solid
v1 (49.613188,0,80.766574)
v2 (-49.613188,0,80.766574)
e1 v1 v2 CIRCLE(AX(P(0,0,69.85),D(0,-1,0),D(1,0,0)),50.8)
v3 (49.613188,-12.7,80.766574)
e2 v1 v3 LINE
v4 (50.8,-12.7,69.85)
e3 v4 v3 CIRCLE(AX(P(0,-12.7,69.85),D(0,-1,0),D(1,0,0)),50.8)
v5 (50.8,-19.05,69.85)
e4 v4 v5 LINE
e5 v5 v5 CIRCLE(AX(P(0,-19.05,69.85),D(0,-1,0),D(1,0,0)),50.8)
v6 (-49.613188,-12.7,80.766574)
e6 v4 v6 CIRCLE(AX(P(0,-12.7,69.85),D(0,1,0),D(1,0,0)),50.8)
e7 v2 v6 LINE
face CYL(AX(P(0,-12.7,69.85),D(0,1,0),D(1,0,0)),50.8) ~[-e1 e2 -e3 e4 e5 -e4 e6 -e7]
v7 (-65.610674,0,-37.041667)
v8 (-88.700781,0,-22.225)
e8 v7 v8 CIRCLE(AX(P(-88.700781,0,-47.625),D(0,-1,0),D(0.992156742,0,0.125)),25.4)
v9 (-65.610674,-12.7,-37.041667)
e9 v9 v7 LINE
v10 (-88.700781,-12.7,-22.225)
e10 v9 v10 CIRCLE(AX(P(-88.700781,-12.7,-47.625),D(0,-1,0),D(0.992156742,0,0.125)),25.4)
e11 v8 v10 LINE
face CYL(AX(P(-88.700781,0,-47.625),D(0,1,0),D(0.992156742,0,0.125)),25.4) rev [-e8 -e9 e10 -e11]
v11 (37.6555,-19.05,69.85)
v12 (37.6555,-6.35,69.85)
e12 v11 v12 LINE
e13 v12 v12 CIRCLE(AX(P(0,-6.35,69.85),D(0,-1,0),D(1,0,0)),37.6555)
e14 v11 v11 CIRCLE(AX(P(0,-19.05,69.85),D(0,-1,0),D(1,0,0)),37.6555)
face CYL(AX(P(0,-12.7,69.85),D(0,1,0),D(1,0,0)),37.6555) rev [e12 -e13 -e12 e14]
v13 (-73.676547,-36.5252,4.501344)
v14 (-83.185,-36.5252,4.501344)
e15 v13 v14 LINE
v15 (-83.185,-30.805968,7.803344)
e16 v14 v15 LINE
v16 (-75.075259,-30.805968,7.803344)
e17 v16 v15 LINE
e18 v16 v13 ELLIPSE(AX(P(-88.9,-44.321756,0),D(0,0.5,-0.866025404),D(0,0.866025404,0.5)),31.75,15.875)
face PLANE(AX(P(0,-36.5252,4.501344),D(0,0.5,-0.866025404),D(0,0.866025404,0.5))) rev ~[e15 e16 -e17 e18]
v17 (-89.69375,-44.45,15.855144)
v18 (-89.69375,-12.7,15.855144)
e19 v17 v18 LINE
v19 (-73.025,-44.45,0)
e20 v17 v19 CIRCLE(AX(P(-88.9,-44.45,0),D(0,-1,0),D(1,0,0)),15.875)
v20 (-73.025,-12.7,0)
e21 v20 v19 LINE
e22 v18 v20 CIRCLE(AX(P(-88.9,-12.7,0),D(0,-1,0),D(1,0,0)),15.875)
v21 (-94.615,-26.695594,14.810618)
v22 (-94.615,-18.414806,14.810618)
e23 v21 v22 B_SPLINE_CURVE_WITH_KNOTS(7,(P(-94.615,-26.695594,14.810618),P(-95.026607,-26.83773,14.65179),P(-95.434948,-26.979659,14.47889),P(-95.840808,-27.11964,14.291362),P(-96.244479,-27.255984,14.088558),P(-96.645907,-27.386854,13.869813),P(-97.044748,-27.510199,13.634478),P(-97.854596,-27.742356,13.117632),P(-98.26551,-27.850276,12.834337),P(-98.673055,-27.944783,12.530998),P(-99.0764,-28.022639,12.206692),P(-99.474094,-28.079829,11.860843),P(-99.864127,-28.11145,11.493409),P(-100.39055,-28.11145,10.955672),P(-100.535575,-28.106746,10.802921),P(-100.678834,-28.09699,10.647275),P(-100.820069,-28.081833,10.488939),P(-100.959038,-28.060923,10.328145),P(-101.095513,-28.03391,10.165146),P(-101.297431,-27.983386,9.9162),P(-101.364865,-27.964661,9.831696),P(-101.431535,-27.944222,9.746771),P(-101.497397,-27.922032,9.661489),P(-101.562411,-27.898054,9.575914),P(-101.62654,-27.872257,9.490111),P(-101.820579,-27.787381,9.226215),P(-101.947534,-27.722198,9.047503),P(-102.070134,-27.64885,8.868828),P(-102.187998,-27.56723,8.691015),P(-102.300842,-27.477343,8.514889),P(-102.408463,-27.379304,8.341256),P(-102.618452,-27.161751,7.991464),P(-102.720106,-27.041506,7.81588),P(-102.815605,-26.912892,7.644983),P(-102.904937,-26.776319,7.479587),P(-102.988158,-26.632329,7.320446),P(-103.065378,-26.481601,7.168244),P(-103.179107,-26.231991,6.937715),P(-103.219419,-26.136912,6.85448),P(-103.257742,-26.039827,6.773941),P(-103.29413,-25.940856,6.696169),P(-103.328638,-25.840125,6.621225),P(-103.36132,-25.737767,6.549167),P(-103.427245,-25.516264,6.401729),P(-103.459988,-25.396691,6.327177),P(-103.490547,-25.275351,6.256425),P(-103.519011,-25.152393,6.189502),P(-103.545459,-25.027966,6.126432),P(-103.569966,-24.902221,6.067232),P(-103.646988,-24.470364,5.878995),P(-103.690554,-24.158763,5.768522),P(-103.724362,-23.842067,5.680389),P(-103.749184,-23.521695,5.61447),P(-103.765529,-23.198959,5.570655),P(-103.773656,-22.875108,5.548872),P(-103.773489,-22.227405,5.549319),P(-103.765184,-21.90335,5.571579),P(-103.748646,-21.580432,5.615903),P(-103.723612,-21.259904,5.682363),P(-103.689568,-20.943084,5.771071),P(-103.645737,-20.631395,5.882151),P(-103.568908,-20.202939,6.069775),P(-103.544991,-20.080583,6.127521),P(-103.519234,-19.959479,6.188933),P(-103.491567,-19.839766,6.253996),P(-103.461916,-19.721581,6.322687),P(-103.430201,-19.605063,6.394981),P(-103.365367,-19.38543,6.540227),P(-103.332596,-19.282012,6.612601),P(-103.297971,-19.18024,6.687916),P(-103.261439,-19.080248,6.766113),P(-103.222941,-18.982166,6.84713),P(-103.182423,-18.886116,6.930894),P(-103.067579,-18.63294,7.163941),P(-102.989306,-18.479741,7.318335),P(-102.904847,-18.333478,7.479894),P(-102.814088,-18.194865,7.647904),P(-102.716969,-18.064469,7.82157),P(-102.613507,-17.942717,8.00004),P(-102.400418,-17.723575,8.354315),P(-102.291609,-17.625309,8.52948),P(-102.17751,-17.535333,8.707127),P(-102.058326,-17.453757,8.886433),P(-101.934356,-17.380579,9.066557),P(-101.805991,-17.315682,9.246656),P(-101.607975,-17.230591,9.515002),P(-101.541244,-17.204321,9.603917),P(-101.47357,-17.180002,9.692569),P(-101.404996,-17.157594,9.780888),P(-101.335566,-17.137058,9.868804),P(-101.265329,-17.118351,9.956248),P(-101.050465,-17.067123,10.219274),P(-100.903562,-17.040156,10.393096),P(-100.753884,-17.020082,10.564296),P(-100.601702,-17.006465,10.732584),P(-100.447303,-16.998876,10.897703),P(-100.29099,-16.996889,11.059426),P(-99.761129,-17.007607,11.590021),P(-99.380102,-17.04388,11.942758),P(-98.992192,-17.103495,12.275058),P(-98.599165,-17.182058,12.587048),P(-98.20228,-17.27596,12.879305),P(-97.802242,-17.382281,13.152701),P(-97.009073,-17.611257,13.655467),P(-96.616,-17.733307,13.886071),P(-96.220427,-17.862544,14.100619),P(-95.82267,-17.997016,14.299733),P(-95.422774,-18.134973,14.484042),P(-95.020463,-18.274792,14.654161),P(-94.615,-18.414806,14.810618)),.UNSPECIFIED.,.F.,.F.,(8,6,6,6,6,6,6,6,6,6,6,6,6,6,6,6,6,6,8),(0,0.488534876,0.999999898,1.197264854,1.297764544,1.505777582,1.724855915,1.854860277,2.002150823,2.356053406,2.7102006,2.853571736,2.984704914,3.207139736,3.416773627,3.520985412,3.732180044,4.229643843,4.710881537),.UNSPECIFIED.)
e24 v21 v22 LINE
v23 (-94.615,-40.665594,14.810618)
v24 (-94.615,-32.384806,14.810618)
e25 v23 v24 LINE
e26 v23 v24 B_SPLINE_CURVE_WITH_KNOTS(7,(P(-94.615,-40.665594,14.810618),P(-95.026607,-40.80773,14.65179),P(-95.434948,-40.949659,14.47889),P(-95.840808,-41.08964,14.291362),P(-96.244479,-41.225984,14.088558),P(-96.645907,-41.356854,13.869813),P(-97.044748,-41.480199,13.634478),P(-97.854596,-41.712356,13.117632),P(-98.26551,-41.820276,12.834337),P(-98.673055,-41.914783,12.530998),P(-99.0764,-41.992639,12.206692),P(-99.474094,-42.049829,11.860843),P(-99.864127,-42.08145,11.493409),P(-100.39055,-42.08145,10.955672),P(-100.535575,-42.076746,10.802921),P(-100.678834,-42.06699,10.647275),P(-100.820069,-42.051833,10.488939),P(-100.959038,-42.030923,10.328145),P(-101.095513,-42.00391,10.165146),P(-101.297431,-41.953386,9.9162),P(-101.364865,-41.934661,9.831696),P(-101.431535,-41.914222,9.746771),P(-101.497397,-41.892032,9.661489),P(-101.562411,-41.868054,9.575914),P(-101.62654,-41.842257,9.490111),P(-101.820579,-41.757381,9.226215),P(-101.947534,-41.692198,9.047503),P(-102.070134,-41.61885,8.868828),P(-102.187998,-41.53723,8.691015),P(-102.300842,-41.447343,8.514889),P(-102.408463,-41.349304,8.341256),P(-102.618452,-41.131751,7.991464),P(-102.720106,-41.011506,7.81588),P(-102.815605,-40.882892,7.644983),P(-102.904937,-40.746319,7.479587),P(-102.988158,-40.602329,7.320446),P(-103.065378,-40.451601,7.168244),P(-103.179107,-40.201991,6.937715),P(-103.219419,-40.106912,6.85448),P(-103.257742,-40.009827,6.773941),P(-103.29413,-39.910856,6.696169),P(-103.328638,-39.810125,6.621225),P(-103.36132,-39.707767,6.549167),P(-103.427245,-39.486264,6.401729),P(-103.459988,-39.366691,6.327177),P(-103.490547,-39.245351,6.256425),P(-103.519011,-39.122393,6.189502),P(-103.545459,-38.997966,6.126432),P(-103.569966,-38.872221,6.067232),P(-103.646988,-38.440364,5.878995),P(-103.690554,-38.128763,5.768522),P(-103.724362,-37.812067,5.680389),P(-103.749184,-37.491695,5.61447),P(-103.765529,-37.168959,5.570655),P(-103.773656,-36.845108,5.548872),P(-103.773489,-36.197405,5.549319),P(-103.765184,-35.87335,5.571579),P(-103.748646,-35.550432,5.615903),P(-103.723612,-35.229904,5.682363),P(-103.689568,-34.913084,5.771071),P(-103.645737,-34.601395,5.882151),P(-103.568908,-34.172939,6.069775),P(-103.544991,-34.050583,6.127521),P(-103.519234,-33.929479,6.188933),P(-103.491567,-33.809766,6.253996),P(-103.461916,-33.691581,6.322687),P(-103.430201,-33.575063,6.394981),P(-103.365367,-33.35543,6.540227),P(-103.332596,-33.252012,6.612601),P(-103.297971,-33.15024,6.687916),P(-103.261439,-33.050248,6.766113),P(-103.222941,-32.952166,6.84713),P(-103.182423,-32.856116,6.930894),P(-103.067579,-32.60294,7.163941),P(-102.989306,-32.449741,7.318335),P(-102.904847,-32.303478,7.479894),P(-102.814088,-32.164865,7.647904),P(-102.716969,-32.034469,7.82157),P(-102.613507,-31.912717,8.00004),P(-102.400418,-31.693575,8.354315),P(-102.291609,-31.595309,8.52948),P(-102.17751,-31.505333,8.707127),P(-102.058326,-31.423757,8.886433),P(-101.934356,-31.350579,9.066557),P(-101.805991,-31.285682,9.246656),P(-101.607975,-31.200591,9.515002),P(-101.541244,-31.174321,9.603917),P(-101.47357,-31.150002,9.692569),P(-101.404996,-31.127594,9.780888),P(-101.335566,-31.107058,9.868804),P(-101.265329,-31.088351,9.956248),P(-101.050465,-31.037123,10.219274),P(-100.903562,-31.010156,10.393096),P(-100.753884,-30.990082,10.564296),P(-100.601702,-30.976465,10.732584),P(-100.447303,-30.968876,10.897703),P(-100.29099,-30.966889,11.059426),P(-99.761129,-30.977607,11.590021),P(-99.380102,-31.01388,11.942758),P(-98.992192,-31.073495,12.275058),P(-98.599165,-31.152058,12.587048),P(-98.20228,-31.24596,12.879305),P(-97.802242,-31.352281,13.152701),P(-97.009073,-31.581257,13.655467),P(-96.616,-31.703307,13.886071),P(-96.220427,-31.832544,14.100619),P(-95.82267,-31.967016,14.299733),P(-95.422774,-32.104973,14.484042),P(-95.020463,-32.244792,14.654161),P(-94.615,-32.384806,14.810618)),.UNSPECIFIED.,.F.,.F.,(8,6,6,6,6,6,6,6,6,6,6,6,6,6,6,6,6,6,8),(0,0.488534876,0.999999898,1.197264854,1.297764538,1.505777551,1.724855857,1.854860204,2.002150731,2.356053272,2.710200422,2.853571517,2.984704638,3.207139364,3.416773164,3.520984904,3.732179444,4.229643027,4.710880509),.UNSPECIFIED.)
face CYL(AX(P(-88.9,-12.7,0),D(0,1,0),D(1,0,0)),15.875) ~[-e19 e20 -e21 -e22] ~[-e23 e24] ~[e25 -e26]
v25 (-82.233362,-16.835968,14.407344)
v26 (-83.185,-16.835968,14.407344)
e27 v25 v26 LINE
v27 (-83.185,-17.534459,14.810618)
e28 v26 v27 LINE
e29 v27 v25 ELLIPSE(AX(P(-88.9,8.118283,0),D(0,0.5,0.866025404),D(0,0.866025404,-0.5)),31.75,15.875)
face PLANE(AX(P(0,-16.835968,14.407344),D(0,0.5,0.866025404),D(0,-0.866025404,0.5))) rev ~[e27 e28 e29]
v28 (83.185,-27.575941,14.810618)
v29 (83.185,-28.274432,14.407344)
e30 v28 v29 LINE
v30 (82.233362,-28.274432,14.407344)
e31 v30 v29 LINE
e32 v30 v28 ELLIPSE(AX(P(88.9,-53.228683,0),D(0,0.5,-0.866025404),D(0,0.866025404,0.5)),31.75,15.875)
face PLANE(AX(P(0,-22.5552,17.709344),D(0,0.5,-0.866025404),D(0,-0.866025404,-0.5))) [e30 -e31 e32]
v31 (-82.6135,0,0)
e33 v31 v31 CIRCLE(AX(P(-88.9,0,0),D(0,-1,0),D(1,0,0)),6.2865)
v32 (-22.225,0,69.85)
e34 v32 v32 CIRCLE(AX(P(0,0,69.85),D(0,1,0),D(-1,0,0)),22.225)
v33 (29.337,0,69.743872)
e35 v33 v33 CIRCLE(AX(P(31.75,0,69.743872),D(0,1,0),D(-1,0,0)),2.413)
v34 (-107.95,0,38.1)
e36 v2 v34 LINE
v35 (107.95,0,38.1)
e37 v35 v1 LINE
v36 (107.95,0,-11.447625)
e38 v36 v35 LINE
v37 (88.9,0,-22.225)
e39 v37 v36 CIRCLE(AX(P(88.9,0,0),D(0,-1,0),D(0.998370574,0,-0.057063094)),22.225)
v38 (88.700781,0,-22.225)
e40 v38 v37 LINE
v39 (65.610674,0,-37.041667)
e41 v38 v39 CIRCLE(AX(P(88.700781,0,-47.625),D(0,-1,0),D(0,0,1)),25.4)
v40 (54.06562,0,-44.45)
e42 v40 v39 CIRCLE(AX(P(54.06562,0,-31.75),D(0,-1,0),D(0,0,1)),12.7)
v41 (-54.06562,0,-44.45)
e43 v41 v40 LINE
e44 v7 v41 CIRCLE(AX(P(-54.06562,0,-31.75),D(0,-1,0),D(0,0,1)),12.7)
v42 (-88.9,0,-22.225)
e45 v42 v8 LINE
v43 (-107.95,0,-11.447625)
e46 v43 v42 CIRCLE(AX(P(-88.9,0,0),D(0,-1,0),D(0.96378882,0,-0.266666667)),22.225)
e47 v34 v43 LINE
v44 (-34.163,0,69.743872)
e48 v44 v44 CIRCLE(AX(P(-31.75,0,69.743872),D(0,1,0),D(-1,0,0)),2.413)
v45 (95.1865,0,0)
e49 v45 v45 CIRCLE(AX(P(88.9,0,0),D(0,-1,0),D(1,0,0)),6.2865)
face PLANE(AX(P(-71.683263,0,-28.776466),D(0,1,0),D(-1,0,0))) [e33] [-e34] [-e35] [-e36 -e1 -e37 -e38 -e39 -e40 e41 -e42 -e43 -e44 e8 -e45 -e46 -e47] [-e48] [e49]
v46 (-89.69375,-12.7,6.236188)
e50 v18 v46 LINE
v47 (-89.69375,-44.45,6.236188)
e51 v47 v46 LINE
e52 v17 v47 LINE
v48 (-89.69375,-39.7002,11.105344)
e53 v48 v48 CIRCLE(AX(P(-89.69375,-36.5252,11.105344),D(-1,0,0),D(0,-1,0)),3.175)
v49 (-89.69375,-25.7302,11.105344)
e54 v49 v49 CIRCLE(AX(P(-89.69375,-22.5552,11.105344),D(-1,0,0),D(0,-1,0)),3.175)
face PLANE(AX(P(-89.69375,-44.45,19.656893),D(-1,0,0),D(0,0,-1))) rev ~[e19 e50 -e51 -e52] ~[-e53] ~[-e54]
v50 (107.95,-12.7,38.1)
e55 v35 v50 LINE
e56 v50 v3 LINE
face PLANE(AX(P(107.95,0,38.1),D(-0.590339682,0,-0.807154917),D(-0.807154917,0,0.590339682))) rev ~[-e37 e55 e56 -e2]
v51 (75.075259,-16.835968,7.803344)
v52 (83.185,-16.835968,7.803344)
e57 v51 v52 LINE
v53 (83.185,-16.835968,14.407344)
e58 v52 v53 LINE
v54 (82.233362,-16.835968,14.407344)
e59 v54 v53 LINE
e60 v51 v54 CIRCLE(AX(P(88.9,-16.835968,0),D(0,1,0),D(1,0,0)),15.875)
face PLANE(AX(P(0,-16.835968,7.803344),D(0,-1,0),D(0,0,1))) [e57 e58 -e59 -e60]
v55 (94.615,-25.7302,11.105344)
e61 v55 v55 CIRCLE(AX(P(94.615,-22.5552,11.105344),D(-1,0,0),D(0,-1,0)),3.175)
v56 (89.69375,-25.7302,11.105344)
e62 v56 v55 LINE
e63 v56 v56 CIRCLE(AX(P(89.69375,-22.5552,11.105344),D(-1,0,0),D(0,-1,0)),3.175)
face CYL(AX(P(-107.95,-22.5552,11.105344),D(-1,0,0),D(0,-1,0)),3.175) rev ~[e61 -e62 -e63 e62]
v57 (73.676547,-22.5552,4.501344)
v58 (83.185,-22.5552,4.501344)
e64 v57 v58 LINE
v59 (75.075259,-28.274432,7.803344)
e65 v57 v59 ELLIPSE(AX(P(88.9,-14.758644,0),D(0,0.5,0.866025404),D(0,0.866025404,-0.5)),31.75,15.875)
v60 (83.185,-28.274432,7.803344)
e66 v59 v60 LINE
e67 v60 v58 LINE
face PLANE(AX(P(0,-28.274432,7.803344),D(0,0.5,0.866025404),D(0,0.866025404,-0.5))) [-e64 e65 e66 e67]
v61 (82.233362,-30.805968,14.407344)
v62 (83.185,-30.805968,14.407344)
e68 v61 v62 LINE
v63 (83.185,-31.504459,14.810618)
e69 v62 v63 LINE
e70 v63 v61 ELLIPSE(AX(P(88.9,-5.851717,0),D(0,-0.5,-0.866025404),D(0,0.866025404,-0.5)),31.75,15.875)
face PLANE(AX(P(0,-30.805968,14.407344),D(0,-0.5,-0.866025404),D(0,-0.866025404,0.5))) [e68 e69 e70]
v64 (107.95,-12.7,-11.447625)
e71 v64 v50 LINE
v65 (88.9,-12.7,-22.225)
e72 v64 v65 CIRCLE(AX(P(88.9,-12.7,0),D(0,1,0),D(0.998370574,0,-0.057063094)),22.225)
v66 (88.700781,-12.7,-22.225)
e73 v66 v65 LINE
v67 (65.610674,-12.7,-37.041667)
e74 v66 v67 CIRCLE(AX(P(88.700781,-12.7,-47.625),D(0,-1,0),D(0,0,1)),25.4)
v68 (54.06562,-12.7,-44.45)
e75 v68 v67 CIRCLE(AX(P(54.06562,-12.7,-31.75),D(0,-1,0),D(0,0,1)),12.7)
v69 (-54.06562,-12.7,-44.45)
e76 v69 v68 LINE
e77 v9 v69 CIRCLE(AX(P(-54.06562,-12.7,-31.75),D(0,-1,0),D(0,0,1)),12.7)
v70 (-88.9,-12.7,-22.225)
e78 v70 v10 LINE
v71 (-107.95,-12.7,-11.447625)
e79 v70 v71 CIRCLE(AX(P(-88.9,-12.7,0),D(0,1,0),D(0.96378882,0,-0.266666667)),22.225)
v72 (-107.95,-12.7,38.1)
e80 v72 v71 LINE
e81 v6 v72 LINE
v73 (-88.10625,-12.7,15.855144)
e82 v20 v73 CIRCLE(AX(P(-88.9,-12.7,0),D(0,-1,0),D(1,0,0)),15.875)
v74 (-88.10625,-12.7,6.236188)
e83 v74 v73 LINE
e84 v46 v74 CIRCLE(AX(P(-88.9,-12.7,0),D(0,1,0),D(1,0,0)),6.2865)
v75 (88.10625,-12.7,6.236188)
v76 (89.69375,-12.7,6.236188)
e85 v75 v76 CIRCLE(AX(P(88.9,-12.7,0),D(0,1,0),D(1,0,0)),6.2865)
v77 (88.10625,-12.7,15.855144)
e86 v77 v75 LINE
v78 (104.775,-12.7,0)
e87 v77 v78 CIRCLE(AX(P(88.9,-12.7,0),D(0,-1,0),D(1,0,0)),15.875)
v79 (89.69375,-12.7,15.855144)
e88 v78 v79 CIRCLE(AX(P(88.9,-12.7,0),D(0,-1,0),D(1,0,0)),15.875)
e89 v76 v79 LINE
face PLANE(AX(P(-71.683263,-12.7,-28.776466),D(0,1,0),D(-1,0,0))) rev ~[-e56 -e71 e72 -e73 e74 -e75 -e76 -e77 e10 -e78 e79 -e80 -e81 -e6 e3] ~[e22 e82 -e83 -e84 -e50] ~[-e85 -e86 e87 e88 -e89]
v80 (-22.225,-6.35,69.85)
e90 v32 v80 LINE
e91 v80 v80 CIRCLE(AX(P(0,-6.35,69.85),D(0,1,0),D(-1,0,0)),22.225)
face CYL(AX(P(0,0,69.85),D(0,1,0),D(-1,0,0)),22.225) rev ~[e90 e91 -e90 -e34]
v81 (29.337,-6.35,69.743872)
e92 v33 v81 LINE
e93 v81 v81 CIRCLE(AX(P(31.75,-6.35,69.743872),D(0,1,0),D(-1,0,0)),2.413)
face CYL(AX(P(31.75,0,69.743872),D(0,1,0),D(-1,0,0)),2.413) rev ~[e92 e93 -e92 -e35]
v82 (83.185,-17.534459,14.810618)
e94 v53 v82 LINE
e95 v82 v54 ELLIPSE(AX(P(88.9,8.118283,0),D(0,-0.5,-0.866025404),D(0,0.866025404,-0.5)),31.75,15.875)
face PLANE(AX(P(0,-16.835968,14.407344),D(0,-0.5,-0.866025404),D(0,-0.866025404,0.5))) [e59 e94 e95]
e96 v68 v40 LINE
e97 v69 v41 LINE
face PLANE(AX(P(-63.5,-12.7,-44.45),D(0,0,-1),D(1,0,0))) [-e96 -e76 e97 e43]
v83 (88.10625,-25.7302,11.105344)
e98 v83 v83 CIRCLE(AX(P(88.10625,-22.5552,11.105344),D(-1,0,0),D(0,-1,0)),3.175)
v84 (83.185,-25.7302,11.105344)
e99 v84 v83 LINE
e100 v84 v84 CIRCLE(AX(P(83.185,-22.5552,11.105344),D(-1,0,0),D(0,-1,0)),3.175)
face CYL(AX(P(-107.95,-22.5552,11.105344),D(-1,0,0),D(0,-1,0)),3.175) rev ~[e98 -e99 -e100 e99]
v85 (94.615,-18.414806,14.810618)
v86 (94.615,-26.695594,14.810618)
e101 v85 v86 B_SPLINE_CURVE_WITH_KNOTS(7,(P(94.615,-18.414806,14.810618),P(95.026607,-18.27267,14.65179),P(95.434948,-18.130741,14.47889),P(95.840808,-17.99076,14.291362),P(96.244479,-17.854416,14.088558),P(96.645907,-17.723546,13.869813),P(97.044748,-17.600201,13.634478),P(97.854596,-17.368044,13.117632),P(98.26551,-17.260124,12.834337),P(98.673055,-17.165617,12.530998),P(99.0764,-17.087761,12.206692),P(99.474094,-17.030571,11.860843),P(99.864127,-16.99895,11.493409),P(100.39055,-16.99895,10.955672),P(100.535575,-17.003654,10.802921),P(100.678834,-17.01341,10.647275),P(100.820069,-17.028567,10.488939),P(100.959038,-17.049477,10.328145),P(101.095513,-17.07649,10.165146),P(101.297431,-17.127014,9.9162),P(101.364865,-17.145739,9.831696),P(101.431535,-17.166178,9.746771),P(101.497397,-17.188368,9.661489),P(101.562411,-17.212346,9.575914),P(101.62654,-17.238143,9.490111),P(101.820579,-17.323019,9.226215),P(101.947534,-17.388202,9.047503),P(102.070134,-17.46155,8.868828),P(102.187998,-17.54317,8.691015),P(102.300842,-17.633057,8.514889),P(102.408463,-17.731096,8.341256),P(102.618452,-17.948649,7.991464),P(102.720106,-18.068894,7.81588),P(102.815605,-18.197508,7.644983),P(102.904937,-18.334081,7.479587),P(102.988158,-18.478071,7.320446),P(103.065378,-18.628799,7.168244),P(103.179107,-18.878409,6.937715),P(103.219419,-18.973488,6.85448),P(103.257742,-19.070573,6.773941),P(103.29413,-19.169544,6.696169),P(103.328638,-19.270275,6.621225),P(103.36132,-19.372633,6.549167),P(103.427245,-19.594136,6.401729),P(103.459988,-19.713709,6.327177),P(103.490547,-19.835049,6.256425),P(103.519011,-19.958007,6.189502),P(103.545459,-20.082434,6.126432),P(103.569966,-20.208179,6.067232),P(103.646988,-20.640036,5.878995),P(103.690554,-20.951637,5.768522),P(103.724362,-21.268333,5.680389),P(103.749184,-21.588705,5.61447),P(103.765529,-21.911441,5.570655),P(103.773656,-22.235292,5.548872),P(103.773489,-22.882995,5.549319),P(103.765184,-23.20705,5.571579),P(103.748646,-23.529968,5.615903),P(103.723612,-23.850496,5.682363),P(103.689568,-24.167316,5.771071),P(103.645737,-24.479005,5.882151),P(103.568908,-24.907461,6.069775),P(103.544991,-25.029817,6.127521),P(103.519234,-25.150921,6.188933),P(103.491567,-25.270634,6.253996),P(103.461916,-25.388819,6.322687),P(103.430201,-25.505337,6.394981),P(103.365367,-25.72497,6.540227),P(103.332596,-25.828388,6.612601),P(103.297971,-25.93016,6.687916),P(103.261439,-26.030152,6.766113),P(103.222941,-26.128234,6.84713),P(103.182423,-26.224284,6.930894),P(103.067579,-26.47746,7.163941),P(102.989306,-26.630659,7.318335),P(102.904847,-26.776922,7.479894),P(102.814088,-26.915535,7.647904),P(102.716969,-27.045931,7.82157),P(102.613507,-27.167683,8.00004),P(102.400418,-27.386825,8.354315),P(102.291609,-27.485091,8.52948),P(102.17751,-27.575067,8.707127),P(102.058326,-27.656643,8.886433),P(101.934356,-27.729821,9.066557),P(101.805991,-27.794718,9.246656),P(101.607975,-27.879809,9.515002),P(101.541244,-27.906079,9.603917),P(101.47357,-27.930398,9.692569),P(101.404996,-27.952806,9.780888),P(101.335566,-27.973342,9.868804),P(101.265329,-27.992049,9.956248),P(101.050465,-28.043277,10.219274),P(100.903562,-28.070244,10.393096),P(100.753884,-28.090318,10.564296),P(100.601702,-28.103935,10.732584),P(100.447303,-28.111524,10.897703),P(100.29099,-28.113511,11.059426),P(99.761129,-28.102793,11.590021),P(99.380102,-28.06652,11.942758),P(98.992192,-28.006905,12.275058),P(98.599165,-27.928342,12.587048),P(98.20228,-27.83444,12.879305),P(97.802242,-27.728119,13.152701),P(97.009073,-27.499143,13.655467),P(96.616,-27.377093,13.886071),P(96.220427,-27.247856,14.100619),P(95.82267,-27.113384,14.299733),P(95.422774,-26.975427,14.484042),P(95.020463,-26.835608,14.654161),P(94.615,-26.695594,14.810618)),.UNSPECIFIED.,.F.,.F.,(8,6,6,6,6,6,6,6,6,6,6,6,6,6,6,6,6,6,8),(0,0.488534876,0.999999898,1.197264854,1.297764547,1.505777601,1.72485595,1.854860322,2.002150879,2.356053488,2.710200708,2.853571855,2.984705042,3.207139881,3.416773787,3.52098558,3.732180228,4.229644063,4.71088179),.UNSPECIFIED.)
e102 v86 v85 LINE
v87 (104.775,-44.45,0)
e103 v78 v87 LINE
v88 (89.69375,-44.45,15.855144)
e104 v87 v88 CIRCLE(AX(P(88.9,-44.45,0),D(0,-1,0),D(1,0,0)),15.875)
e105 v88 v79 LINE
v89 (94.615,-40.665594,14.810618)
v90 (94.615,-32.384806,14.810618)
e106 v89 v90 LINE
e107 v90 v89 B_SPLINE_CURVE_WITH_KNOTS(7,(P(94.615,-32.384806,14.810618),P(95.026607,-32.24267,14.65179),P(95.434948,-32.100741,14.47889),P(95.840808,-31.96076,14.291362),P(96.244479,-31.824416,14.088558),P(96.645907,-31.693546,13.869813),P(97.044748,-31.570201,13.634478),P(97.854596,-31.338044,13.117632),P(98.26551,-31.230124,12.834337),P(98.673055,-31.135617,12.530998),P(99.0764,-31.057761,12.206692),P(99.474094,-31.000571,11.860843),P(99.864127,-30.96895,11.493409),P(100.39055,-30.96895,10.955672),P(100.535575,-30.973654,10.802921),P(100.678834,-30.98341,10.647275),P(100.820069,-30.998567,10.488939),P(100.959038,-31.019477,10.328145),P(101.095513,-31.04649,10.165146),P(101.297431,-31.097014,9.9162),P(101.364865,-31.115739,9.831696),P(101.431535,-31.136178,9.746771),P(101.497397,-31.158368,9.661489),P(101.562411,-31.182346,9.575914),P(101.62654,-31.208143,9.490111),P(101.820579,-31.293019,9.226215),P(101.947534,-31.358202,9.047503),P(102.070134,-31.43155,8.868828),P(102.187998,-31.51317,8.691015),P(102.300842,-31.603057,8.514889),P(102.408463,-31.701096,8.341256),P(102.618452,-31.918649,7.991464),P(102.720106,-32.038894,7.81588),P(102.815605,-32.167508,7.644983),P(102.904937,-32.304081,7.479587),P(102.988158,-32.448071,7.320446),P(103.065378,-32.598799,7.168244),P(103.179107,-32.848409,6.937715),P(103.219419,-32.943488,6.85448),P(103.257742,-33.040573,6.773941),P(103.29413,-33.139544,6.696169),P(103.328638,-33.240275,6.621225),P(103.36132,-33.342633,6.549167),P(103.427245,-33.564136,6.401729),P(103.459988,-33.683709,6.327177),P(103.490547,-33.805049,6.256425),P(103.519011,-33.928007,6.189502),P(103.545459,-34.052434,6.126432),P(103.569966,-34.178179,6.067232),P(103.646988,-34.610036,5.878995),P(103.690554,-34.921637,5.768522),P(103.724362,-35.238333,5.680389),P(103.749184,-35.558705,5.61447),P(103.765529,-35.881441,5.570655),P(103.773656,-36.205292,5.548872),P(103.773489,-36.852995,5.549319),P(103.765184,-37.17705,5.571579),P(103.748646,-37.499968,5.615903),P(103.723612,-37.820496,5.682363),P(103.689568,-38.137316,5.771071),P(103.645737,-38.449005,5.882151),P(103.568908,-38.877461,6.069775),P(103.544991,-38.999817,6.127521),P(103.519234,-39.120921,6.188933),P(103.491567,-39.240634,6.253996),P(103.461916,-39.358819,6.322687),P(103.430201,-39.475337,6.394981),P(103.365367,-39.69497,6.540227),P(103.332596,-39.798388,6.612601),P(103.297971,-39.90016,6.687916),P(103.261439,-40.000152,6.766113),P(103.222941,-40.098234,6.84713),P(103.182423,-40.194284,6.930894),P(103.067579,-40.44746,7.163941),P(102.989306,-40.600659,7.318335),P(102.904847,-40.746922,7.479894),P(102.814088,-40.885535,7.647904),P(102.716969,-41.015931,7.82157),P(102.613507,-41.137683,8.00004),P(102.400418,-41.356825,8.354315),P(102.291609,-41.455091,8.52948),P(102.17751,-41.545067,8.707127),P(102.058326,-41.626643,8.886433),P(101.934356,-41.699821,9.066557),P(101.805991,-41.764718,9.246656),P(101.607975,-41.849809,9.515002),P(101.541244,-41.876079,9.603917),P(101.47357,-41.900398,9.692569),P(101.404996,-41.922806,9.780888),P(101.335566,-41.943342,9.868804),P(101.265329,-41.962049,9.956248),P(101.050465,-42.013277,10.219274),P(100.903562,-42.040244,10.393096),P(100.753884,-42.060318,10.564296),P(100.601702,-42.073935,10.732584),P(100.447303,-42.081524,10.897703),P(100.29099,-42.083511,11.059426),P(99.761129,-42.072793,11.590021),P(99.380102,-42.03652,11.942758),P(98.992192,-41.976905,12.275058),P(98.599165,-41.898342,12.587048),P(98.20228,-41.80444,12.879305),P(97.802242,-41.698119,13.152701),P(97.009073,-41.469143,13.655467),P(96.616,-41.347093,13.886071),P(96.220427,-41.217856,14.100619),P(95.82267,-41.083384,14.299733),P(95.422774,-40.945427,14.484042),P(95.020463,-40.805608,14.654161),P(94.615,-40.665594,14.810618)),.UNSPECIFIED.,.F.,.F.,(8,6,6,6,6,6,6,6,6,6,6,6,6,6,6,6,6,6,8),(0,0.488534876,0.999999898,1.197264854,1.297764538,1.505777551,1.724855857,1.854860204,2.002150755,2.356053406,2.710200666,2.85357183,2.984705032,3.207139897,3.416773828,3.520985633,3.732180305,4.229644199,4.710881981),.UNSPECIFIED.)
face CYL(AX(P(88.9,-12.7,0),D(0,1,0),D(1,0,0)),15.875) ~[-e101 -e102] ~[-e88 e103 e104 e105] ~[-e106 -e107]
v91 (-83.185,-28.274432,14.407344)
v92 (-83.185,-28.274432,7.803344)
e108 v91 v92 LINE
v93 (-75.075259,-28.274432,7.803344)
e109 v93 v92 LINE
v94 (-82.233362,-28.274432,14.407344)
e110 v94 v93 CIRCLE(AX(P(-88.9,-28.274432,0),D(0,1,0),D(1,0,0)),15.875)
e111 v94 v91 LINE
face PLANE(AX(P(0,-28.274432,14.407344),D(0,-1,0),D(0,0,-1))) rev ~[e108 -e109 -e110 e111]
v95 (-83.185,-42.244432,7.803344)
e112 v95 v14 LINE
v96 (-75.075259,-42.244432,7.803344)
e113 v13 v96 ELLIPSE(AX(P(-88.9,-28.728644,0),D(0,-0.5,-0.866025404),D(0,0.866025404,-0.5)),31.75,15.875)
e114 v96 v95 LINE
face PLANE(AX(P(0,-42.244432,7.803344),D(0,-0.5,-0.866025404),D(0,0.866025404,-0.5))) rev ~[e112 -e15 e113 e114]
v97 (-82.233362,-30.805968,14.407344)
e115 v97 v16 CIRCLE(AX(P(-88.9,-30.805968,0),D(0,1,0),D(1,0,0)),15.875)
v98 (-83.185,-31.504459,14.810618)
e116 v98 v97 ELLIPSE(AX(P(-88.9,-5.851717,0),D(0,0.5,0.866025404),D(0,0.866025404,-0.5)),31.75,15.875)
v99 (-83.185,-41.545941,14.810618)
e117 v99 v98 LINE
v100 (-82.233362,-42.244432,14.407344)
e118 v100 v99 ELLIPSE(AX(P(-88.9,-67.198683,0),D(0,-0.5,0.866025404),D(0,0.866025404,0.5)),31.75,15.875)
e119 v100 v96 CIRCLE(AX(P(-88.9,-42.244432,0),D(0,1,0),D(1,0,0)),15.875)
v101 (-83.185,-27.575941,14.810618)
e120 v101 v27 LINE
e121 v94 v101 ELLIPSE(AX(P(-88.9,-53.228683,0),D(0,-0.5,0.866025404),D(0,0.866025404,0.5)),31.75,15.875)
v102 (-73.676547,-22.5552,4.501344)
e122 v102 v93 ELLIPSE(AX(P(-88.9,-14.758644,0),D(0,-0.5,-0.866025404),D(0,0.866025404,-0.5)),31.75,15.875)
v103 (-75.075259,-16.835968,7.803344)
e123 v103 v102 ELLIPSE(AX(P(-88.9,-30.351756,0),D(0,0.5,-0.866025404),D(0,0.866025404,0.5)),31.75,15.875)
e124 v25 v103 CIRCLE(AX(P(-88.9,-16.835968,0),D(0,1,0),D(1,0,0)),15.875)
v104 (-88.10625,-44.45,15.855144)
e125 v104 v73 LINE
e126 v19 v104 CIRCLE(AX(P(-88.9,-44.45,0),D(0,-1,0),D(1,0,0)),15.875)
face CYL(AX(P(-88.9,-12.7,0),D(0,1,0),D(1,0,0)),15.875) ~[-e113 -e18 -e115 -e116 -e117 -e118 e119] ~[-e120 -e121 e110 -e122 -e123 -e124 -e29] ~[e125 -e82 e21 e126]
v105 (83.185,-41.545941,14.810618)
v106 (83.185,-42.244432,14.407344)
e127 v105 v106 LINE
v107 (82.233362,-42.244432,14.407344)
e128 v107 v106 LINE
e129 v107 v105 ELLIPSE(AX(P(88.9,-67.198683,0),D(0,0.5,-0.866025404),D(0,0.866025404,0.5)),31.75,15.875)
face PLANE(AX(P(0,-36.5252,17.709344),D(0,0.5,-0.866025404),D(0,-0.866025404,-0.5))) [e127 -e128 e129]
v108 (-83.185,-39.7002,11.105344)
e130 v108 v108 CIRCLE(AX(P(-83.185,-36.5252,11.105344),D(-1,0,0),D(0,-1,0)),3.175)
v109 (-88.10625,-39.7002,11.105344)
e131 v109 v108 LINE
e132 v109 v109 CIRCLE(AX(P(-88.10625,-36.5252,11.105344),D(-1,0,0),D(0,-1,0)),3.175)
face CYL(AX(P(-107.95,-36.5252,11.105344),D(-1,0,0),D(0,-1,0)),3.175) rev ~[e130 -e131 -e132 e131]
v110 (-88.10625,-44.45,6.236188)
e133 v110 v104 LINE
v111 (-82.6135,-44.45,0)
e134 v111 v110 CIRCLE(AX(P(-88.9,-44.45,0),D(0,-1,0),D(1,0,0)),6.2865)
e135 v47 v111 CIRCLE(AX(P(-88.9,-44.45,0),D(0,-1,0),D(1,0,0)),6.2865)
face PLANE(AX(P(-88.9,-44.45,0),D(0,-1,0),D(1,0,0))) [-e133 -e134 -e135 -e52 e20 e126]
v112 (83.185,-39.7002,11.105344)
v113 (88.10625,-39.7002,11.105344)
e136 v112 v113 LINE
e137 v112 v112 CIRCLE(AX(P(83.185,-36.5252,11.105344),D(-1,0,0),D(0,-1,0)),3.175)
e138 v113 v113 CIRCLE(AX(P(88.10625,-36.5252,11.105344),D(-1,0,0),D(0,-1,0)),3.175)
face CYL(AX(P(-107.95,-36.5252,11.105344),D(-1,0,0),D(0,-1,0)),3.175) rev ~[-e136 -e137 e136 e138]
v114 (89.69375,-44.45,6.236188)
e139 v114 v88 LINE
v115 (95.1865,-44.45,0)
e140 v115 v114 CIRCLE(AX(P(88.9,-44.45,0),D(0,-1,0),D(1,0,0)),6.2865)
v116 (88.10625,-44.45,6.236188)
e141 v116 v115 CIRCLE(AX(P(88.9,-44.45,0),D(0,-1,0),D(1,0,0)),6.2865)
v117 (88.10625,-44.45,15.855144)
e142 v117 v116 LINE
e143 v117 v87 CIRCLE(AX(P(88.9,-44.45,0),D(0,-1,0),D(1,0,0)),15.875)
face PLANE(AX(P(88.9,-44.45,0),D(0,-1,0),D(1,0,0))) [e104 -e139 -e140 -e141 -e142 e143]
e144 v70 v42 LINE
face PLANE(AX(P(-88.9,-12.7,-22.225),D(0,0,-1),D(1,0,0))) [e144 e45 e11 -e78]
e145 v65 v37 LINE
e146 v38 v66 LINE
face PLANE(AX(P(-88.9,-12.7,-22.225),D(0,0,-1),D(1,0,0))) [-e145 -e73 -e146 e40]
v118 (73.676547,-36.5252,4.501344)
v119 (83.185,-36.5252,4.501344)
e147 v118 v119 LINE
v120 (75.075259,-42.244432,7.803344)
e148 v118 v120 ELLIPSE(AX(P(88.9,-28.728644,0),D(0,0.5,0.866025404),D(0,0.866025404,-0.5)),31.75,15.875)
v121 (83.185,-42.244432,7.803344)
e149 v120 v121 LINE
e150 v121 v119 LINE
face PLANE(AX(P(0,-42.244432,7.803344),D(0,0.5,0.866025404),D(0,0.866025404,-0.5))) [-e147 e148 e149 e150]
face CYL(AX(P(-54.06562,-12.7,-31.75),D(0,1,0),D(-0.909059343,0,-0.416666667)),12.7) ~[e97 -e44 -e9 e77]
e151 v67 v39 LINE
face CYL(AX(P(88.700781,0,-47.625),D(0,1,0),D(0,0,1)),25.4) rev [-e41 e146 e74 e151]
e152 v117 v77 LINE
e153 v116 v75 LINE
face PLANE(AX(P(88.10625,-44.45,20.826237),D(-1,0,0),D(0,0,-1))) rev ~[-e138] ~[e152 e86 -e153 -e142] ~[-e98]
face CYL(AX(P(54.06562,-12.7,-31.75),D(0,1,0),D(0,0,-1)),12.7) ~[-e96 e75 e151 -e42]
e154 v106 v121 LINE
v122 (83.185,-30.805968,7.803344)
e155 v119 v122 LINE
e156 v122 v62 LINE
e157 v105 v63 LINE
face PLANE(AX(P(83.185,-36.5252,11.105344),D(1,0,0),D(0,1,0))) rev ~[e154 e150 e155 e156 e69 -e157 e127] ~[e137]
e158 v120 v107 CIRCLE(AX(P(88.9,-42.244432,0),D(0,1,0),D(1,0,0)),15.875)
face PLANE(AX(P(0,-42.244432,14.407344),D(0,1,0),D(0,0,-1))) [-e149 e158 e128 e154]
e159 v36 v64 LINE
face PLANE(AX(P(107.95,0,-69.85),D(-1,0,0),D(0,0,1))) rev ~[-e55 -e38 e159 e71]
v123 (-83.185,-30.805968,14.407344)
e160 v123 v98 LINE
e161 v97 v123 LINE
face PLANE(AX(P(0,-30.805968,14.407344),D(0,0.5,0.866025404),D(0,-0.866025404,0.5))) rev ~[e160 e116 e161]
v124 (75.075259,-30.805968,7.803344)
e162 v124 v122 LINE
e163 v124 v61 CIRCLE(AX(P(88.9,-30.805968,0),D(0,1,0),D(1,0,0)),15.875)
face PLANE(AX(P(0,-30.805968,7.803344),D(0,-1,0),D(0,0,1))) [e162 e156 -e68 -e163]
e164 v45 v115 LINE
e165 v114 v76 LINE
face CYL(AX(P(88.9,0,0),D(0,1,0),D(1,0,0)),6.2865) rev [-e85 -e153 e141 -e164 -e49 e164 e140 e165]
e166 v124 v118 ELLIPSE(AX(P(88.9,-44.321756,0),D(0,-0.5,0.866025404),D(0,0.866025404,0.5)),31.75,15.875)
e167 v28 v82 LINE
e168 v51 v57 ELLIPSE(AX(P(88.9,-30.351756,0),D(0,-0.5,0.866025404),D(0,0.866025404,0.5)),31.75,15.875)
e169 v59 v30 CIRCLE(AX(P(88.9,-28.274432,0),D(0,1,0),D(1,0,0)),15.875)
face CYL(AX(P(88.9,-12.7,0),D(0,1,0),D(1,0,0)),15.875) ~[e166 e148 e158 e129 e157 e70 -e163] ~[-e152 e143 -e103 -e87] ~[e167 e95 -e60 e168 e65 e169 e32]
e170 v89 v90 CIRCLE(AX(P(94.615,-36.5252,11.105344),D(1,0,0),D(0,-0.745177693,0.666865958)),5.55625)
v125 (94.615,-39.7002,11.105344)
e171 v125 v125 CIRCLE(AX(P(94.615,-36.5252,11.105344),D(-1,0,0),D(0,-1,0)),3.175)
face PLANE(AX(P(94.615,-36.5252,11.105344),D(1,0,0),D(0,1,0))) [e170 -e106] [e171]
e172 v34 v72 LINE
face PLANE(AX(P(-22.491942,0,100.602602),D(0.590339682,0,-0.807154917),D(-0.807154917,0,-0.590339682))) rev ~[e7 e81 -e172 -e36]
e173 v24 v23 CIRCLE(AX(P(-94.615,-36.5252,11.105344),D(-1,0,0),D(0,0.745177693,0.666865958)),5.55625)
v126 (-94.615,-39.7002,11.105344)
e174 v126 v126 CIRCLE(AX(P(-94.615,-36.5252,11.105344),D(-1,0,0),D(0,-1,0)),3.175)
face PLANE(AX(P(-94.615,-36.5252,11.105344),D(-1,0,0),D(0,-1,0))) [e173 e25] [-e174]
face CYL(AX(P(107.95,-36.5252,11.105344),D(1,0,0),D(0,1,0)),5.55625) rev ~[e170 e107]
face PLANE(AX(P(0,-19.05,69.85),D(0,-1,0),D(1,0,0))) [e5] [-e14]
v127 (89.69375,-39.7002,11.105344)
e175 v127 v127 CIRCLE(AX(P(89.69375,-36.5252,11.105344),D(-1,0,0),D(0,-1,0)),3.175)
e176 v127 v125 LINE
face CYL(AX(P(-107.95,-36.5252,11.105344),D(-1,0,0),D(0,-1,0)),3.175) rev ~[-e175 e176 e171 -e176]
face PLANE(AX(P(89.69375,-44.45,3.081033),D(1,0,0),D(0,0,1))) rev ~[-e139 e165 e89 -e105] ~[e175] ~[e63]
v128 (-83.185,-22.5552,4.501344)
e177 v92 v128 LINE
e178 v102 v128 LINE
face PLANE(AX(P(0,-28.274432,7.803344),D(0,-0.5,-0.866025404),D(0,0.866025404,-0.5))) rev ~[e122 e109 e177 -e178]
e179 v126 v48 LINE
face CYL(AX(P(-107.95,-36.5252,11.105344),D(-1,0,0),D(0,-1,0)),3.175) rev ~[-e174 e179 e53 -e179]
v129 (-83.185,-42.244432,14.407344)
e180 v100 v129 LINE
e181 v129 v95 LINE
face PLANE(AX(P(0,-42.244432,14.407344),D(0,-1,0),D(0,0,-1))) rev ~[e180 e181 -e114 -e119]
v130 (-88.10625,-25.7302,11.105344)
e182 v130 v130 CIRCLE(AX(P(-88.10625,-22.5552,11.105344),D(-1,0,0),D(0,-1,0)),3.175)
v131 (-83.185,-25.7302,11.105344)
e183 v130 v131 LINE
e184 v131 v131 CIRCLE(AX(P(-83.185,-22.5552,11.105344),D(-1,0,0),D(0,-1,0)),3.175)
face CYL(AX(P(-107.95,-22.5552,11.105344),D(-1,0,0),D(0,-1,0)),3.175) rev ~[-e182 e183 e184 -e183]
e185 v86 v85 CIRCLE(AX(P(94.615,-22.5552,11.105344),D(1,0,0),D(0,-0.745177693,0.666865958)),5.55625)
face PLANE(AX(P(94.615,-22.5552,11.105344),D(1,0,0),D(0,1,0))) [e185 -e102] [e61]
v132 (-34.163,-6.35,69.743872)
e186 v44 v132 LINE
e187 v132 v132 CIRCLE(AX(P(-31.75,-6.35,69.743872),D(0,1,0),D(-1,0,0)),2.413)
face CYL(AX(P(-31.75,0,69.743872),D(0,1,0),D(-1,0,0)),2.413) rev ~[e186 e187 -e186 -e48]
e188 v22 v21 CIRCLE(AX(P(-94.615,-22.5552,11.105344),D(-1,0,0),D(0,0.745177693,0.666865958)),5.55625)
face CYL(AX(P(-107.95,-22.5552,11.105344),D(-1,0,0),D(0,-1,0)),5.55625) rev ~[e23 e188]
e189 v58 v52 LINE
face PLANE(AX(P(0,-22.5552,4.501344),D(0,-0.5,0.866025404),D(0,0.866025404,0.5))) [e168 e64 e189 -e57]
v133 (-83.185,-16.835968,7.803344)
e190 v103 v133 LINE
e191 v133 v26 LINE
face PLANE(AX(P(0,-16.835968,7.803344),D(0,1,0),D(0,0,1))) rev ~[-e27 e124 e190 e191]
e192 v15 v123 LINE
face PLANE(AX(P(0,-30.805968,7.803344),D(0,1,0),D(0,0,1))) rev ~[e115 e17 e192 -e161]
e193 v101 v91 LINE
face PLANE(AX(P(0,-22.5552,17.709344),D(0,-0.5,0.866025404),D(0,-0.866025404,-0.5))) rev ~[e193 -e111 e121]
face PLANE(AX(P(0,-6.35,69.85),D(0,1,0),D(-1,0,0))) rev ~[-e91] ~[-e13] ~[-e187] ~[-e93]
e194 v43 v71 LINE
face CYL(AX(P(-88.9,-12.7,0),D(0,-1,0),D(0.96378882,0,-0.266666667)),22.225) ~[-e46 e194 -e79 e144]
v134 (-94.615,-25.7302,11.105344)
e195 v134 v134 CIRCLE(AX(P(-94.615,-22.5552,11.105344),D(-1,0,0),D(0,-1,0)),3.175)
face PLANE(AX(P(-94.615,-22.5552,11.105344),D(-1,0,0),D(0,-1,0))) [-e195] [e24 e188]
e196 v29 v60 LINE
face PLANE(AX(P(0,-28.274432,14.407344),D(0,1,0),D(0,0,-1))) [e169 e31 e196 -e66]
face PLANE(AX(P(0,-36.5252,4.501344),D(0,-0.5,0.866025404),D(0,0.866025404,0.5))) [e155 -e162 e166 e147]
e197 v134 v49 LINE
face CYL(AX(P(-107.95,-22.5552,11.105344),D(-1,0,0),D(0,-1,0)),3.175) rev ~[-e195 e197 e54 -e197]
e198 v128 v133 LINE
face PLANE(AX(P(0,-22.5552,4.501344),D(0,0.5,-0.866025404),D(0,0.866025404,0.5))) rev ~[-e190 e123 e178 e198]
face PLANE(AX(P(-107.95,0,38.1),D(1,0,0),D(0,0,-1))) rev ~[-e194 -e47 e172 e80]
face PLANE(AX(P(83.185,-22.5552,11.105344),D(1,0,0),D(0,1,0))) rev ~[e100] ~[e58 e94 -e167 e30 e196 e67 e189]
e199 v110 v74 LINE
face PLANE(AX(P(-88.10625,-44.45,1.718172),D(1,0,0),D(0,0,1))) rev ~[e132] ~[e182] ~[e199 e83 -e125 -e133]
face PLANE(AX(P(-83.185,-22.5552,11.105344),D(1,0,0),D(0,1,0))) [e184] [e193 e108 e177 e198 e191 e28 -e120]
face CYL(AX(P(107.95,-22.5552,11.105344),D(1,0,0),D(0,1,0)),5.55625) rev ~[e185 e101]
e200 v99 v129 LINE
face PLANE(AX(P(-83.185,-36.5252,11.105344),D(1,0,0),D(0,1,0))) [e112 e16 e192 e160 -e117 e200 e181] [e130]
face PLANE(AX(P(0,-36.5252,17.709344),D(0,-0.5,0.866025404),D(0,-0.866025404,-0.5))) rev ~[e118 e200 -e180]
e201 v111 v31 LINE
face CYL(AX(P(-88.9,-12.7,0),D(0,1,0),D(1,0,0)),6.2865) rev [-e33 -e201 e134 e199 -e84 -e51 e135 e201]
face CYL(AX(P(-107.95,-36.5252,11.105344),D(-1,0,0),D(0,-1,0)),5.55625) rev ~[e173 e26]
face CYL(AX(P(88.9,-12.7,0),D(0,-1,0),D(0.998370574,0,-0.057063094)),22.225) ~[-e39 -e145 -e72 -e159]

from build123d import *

# Parameters (mm, degrees)
F0_R           = 4.7625
F0_R_2         = 6.2865
F0_R_3         = 37.6555
F1_DEPTH       = 12.7
F2_R           = 63.5
F3_DEPTH       = 25.4
F4_R           = 12.7
F5_R           = 15.875
F5_R_2         = 6.2865
F6_DEPTH       = 31.75
F8_DEPTH       = 31.75
F9_R           = 3.175
F10_DEPTH      = 224.536
F12_DEPTH      = 83.185
F12_DEPTH_BACK = 83.185
F13_R          = 5.55625
F14_DEPTH      = 13.335
F15_R          = 5.55625
F16_DEPTH      = 13.335
F17_W          = 51.1538733715
F17_H          = 19.05
F17_R          = 3.175
F18_DEPTH      = 4.7498
F19_R          = 12.7
F20_R          = 50.8
F20_R_2        = 37.6555
F21_DEPTH      = 12.7
F22_R          = 37.6555
F22_R_2        = 22.225
F23_DEPTH      = 6.35
F24_R          = 2.413
F25_DEPTH      = 25.4
F26_R          = 50.8
F26_R_2        = 37.6555
F27_DEPTH      = 6.35
F29_DEPTH      = 25.4
F29_DEPTH_BACK = 25.4
F31_DEPTH      = 12.7
F32_W          = 127
F32_H          = 63.5
F33_DEPTH      = 12.7
F34_T1_DEPTH   = 12.7
F35_R          = 12.7


# Not quite as in the source:
# - a fillet or chamfer that OpenCascade refuses, or shapes differently, is made with other operations: its cross-section is extruded or revolved along the edge and cut away or added


with BuildPart() as f1:
    # F0 (on Front) → F1 (new body)
    with BuildSketch(Plane.XZ):
        with BuildLine():
            Line((-107.95, 38.1), (-107.95, -69.85))
            Line((-107.95, -69.85), (107.95, -69.85))
            Line((107.95, -69.85), (107.95, 38.1))
            Line((107.95, 38.1), (22.4919418666, 100.6026023463))
            ThreePointArc((22.4919418666, 100.6026023463), (0, 107.95), (-22.4919418666, 100.6026023463))
            Line((-22.4919418666, 100.6026023463), (-107.95, 38.1))
        make_face()
        with Locations((-88.9, -44.45)):
            Circle(F0_R, mode=Mode.SUBTRACT)
        with Locations((-88.9, 0)):
            Circle(F0_R_2, mode=Mode.SUBTRACT)
        with Locations((88.9, -44.45)):
            Circle(F0_R, mode=Mode.SUBTRACT)
        with Locations((88.9, 0)):
            Circle(F0_R_2, mode=Mode.SUBTRACT)
        with Locations((0, 69.85)):
            Circle(F0_R_3, mode=Mode.SUBTRACT)
    extrude(amount=F1_DEPTH)

    # F2 (on face) → F3 (cut)
    with BuildSketch(Plane.XZ.offset(12.7)):
        with Locations((0, -107.95)):
            Circle(F2_R)
    extrude(amount=-F3_DEPTH, mode=Mode.SUBTRACT)

    # F4
    f4_edges = [f1.edges().sort_by_distance(p)[0] for p in [
        (-50.8, -6.35, -69.85),
        (50.8, -6.35, -69.85),
    ]]
    fillet(f4_edges, radius=F4_R)

    # F5 (on face) → F6 (join)
    with BuildSketch(Plane.XZ.offset(12.7)):
        with Locations((-88.9, 0)):
            Circle(F5_R)
        with Locations((-88.9, 0)):
            Circle(F5_R_2, mode=Mode.SUBTRACT)
        with Locations((88.9, 0)):
            Circle(F5_R)
        with Locations((88.9, 0)):
            Circle(F5_R_2, mode=Mode.SUBTRACT)
    extrude(amount=F6_DEPTH)

    # F7 (on face) → F8 (cut, through all)
    with BuildSketch(Plane.XZ.offset(44.45)):
        Polygon((-89.69375, 19.6568928659), (-89.69375, 1.7181718722), (-88.9, 1.7181718722), (-88.10625, 1.7181718722), (-88.10625, 19.6568928659), align=None)
        Polygon((89.69375, 20.8262372762), (88.10625, 20.8262372762), (88.10625, 3.0810327735), (88.9, 3.0810327735), (89.69375, 3.0810327735), align=None)
    extrude(amount=-F8_DEPTH, mode=Mode.SUBTRACT)

    # F9 (on face) → F10 (cut)
    with BuildSketch(Plane(origin=(-107.95, 0, 0), x_dir=(0, -1, 0), z_dir=(-1, 0, 0))):
        with Locations((36.5252, 11.1053438321)):
            Circle(F9_R)
        with Locations((22.5552, 11.1053438321)):
            Circle(F9_R)
    extrude(amount=-F10_DEPTH, mode=Mode.SUBTRACT)

    # F11 (on Right) → F12 (cut, two sides)
    with BuildSketch(Plane.YZ) as f12_sk:
        Polygon((-30.8059682334, 14.4073438321), (-36.5252, 17.7093438321), (-42.2444317666, 14.4073438321), (-42.2444317666, 7.8033438321), (-36.5252, 4.5013438321), (-30.8059682334, 7.8033438321), align=None)
        Polygon((-22.5552, 17.7093438321), (-28.2744317666, 14.4073438321), (-28.2744317666, 7.8033438321), (-22.5552, 4.5013438321), (-16.8359682334, 7.8033438321), (-16.8359682334, 14.4073438321), align=None)
    extrude(amount=-F12_DEPTH, mode=Mode.SUBTRACT)
    extrude(f12_sk.sketch, amount=F12_DEPTH_BACK, mode=Mode.SUBTRACT)

    # F13 (on face) → F14 (cut)
    with BuildSketch(Plane(origin=(-107.95, 0, 0), x_dir=(0, -1, 0), z_dir=(-1, 0, 0))):
        with Locations((22.5552, 11.1053438321)):
            Circle(F13_R)
        with Locations((36.5252, 11.1053438321)):
            Circle(F13_R)
    extrude(amount=-F14_DEPTH, mode=Mode.SUBTRACT)

    # F15 (on face) → F16 (cut)
    with BuildSketch(Plane.YZ.offset(107.95)):
        with Locations((-36.5252, 11.1053438321)):
            Circle(F15_R)
        with Locations((-22.5552, 11.1053438321)):
            Circle(F15_R)
    extrude(amount=-F16_DEPTH, mode=Mode.SUBTRACT)

    # F17 (on face) → F18 (join)
    with BuildSketch(Plane(origin=(0, 0, -69.85), x_dir=(1, 0, 0), z_dir=(0, 0, -1))):
        with Locations((82.3730633142, 22.225)):
            Rectangle(F17_W, F17_H)
        with Locations((82.3730633142, 22.225)):
            Circle(F17_R, mode=Mode.SUBTRACT)
        with Locations((-82.3730633142, 22.225)):
            Rectangle(F17_W, F17_H)
        with Locations((-82.3730633142, 22.225)):
            Circle(F17_R, mode=Mode.SUBTRACT)
    extrude(amount=-F18_DEPTH)

    # F19
    f19_edges = [f1.edges().sort_by_distance(p)[0] for p in [
        (56.796127, -31.75, -67.4751),
        (107.95, -31.75, -67.4751),
        (-56.796127, -31.75, -67.4751),
        (-107.95, -31.75, -67.4751),
    ]]
    fillet(f19_edges, radius=F19_R)

    # F20 (on face) → F21 (join)
    with BuildSketch(Plane.XZ.offset(12.7)):
        with Locations((0, 69.85)):
            Circle(F20_R)
        with Locations((0, 69.85)):
            Circle(F20_R_2, mode=Mode.SUBTRACT)
    extrude(amount=-F21_DEPTH)

    # F22 (on face) → F23 (join)
    with BuildSketch(Plane(origin=(0, 0, 0), x_dir=(-1, 0, 0), z_dir=(0, 1, 0))):
        with Locations((0, 69.85)):
            Circle(F22_R)
        with Locations((0, 69.85)):
            Circle(F22_R_2, mode=Mode.SUBTRACT)
    extrude(amount=-F23_DEPTH)

    # F24 (on face) → F25 (cut)
    with BuildSketch(Plane(origin=(0, 0, 0), x_dir=(-1, 0, 0), z_dir=(0, 1, 0))):
        with Locations((-31.75, 69.7438716888)):
            Circle(F24_R)
        with Locations((31.75, 69.7438716888)):
            Circle(F24_R)
    extrude(amount=-F25_DEPTH, mode=Mode.SUBTRACT)

    # F26 (on face) → F27 (join)
    with BuildSketch(Plane.XZ.offset(12.7)):
        with Locations((0, 69.85)):
            Circle(F26_R)
        with Locations((0, 69.85)):
            Circle(F26_R_2, mode=Mode.SUBTRACT)
    extrude(amount=F27_DEPTH)

    # F28 (on face) → F29 (cut, two sides)
    with BuildSketch(Plane.XZ.offset(12.7)) as f29_sk:
        with BuildLine():
            Line((-111.0971693669, -1.1118889771), (-111.0971693669, 1.1118889771))
            ThreePointArc((-111.0971693669, 1.1118889771), (-111.125, 0), (-111.0971693669, -1.1118889771))
        make_face()
        with BuildLine():
            Line((111.0887860106, 1.268227257), (111.0887860106, -1.268227257))
            ThreePointArc((111.0887860106, -1.268227257), (111.125, 0), (111.0887860106, 1.268227257))
        make_face()
        with BuildLine():
            ThreePointArc((-67.4797934832, -5.9266666667), (-91.3385321133, -22.0908167828), (-111.0971693669, -1.1118889771))
            Line((-111.0971693669, -1.1118889771), (-111.0971693669, -81.4233198762))
            Line((-111.0971693669, -81.4233198762), (111.0887860106, -81.4233198762))
            Line((111.0887860106, -81.4233198762), (111.0887860106, -1.268227257))
            ThreePointArc((111.0887860106, -1.268227257), (91.2607081656, -22.0992688105), (67.4797934832, -5.9266666667))
            ThreePointArc((67.4797934832, -5.9266666667), (58.3800212628, 7.5138896142), (42.999557464, 12.7))
            Line((42.999557464, 12.7), (-42.999557464, 12.7))
            ThreePointArc((-42.999557464, 12.7), (-58.3800212628, 7.5138896142), (-67.4797934832, -5.9266666667))
        make_face()
    extrude(amount=-F29_DEPTH, mode=Mode.SUBTRACT)
    extrude(f29_sk.sketch, amount=F29_DEPTH_BACK, mode=Mode.SUBTRACT)

    # F30 (on face) → F31 (join)
    with BuildSketch(Plane.XZ.offset(12.7)):
        Polygon((60.325, 16.4488966558), (-60.325, 16.4488966558), (-72.7481624406, -10.2908842741), (-88.9, -22.225), (88.9, -22.225), (72.7481624406, -10.2908842741), align=None)
    extrude(amount=-F31_DEPTH)

    # F32 (on face) → F33 (join)
    with BuildSketch(Plane.XZ.offset(12.7)):
        with Locations((0, -12.7)):
            Rectangle(F32_W, F32_H)
    extrude(amount=-F33_DEPTH)

    # F34: fillet of radius 25.4 on 2 edges, made by hand

    # F34_s2 → F34_t1 (join)
    with BuildSketch(Plane.XZ):
        with BuildLine():
            ThreePointArc((-63.5, -44.45), (-71.9002604126, -28.575), (-88.7007812379, -22.225))
            Line((-88.7007812379, -22.225), (-63.5, -22.225))
            Line((-63.5, -22.225), (-63.5, -44.45))
        make_face()
        with BuildLine():
            ThreePointArc((88.7007812379, -22.225), (71.9002604126, -28.575), (63.5, -44.45))
            Line((63.5, -44.45), (63.5, -22.225))
            Line((63.5, -22.225), (88.7007812379, -22.225))
        make_face()
    extrude(amount=F34_T1_DEPTH)

    # F35
    f35_edges = [f1.edges().sort_by_distance(p)[0] for p in [
        (-63.5, -6.35, -44.45),
        (63.5, -6.35, -44.45),
    ]]
    fillet(f35_edges, radius=F35_R)


solid = f1.part
